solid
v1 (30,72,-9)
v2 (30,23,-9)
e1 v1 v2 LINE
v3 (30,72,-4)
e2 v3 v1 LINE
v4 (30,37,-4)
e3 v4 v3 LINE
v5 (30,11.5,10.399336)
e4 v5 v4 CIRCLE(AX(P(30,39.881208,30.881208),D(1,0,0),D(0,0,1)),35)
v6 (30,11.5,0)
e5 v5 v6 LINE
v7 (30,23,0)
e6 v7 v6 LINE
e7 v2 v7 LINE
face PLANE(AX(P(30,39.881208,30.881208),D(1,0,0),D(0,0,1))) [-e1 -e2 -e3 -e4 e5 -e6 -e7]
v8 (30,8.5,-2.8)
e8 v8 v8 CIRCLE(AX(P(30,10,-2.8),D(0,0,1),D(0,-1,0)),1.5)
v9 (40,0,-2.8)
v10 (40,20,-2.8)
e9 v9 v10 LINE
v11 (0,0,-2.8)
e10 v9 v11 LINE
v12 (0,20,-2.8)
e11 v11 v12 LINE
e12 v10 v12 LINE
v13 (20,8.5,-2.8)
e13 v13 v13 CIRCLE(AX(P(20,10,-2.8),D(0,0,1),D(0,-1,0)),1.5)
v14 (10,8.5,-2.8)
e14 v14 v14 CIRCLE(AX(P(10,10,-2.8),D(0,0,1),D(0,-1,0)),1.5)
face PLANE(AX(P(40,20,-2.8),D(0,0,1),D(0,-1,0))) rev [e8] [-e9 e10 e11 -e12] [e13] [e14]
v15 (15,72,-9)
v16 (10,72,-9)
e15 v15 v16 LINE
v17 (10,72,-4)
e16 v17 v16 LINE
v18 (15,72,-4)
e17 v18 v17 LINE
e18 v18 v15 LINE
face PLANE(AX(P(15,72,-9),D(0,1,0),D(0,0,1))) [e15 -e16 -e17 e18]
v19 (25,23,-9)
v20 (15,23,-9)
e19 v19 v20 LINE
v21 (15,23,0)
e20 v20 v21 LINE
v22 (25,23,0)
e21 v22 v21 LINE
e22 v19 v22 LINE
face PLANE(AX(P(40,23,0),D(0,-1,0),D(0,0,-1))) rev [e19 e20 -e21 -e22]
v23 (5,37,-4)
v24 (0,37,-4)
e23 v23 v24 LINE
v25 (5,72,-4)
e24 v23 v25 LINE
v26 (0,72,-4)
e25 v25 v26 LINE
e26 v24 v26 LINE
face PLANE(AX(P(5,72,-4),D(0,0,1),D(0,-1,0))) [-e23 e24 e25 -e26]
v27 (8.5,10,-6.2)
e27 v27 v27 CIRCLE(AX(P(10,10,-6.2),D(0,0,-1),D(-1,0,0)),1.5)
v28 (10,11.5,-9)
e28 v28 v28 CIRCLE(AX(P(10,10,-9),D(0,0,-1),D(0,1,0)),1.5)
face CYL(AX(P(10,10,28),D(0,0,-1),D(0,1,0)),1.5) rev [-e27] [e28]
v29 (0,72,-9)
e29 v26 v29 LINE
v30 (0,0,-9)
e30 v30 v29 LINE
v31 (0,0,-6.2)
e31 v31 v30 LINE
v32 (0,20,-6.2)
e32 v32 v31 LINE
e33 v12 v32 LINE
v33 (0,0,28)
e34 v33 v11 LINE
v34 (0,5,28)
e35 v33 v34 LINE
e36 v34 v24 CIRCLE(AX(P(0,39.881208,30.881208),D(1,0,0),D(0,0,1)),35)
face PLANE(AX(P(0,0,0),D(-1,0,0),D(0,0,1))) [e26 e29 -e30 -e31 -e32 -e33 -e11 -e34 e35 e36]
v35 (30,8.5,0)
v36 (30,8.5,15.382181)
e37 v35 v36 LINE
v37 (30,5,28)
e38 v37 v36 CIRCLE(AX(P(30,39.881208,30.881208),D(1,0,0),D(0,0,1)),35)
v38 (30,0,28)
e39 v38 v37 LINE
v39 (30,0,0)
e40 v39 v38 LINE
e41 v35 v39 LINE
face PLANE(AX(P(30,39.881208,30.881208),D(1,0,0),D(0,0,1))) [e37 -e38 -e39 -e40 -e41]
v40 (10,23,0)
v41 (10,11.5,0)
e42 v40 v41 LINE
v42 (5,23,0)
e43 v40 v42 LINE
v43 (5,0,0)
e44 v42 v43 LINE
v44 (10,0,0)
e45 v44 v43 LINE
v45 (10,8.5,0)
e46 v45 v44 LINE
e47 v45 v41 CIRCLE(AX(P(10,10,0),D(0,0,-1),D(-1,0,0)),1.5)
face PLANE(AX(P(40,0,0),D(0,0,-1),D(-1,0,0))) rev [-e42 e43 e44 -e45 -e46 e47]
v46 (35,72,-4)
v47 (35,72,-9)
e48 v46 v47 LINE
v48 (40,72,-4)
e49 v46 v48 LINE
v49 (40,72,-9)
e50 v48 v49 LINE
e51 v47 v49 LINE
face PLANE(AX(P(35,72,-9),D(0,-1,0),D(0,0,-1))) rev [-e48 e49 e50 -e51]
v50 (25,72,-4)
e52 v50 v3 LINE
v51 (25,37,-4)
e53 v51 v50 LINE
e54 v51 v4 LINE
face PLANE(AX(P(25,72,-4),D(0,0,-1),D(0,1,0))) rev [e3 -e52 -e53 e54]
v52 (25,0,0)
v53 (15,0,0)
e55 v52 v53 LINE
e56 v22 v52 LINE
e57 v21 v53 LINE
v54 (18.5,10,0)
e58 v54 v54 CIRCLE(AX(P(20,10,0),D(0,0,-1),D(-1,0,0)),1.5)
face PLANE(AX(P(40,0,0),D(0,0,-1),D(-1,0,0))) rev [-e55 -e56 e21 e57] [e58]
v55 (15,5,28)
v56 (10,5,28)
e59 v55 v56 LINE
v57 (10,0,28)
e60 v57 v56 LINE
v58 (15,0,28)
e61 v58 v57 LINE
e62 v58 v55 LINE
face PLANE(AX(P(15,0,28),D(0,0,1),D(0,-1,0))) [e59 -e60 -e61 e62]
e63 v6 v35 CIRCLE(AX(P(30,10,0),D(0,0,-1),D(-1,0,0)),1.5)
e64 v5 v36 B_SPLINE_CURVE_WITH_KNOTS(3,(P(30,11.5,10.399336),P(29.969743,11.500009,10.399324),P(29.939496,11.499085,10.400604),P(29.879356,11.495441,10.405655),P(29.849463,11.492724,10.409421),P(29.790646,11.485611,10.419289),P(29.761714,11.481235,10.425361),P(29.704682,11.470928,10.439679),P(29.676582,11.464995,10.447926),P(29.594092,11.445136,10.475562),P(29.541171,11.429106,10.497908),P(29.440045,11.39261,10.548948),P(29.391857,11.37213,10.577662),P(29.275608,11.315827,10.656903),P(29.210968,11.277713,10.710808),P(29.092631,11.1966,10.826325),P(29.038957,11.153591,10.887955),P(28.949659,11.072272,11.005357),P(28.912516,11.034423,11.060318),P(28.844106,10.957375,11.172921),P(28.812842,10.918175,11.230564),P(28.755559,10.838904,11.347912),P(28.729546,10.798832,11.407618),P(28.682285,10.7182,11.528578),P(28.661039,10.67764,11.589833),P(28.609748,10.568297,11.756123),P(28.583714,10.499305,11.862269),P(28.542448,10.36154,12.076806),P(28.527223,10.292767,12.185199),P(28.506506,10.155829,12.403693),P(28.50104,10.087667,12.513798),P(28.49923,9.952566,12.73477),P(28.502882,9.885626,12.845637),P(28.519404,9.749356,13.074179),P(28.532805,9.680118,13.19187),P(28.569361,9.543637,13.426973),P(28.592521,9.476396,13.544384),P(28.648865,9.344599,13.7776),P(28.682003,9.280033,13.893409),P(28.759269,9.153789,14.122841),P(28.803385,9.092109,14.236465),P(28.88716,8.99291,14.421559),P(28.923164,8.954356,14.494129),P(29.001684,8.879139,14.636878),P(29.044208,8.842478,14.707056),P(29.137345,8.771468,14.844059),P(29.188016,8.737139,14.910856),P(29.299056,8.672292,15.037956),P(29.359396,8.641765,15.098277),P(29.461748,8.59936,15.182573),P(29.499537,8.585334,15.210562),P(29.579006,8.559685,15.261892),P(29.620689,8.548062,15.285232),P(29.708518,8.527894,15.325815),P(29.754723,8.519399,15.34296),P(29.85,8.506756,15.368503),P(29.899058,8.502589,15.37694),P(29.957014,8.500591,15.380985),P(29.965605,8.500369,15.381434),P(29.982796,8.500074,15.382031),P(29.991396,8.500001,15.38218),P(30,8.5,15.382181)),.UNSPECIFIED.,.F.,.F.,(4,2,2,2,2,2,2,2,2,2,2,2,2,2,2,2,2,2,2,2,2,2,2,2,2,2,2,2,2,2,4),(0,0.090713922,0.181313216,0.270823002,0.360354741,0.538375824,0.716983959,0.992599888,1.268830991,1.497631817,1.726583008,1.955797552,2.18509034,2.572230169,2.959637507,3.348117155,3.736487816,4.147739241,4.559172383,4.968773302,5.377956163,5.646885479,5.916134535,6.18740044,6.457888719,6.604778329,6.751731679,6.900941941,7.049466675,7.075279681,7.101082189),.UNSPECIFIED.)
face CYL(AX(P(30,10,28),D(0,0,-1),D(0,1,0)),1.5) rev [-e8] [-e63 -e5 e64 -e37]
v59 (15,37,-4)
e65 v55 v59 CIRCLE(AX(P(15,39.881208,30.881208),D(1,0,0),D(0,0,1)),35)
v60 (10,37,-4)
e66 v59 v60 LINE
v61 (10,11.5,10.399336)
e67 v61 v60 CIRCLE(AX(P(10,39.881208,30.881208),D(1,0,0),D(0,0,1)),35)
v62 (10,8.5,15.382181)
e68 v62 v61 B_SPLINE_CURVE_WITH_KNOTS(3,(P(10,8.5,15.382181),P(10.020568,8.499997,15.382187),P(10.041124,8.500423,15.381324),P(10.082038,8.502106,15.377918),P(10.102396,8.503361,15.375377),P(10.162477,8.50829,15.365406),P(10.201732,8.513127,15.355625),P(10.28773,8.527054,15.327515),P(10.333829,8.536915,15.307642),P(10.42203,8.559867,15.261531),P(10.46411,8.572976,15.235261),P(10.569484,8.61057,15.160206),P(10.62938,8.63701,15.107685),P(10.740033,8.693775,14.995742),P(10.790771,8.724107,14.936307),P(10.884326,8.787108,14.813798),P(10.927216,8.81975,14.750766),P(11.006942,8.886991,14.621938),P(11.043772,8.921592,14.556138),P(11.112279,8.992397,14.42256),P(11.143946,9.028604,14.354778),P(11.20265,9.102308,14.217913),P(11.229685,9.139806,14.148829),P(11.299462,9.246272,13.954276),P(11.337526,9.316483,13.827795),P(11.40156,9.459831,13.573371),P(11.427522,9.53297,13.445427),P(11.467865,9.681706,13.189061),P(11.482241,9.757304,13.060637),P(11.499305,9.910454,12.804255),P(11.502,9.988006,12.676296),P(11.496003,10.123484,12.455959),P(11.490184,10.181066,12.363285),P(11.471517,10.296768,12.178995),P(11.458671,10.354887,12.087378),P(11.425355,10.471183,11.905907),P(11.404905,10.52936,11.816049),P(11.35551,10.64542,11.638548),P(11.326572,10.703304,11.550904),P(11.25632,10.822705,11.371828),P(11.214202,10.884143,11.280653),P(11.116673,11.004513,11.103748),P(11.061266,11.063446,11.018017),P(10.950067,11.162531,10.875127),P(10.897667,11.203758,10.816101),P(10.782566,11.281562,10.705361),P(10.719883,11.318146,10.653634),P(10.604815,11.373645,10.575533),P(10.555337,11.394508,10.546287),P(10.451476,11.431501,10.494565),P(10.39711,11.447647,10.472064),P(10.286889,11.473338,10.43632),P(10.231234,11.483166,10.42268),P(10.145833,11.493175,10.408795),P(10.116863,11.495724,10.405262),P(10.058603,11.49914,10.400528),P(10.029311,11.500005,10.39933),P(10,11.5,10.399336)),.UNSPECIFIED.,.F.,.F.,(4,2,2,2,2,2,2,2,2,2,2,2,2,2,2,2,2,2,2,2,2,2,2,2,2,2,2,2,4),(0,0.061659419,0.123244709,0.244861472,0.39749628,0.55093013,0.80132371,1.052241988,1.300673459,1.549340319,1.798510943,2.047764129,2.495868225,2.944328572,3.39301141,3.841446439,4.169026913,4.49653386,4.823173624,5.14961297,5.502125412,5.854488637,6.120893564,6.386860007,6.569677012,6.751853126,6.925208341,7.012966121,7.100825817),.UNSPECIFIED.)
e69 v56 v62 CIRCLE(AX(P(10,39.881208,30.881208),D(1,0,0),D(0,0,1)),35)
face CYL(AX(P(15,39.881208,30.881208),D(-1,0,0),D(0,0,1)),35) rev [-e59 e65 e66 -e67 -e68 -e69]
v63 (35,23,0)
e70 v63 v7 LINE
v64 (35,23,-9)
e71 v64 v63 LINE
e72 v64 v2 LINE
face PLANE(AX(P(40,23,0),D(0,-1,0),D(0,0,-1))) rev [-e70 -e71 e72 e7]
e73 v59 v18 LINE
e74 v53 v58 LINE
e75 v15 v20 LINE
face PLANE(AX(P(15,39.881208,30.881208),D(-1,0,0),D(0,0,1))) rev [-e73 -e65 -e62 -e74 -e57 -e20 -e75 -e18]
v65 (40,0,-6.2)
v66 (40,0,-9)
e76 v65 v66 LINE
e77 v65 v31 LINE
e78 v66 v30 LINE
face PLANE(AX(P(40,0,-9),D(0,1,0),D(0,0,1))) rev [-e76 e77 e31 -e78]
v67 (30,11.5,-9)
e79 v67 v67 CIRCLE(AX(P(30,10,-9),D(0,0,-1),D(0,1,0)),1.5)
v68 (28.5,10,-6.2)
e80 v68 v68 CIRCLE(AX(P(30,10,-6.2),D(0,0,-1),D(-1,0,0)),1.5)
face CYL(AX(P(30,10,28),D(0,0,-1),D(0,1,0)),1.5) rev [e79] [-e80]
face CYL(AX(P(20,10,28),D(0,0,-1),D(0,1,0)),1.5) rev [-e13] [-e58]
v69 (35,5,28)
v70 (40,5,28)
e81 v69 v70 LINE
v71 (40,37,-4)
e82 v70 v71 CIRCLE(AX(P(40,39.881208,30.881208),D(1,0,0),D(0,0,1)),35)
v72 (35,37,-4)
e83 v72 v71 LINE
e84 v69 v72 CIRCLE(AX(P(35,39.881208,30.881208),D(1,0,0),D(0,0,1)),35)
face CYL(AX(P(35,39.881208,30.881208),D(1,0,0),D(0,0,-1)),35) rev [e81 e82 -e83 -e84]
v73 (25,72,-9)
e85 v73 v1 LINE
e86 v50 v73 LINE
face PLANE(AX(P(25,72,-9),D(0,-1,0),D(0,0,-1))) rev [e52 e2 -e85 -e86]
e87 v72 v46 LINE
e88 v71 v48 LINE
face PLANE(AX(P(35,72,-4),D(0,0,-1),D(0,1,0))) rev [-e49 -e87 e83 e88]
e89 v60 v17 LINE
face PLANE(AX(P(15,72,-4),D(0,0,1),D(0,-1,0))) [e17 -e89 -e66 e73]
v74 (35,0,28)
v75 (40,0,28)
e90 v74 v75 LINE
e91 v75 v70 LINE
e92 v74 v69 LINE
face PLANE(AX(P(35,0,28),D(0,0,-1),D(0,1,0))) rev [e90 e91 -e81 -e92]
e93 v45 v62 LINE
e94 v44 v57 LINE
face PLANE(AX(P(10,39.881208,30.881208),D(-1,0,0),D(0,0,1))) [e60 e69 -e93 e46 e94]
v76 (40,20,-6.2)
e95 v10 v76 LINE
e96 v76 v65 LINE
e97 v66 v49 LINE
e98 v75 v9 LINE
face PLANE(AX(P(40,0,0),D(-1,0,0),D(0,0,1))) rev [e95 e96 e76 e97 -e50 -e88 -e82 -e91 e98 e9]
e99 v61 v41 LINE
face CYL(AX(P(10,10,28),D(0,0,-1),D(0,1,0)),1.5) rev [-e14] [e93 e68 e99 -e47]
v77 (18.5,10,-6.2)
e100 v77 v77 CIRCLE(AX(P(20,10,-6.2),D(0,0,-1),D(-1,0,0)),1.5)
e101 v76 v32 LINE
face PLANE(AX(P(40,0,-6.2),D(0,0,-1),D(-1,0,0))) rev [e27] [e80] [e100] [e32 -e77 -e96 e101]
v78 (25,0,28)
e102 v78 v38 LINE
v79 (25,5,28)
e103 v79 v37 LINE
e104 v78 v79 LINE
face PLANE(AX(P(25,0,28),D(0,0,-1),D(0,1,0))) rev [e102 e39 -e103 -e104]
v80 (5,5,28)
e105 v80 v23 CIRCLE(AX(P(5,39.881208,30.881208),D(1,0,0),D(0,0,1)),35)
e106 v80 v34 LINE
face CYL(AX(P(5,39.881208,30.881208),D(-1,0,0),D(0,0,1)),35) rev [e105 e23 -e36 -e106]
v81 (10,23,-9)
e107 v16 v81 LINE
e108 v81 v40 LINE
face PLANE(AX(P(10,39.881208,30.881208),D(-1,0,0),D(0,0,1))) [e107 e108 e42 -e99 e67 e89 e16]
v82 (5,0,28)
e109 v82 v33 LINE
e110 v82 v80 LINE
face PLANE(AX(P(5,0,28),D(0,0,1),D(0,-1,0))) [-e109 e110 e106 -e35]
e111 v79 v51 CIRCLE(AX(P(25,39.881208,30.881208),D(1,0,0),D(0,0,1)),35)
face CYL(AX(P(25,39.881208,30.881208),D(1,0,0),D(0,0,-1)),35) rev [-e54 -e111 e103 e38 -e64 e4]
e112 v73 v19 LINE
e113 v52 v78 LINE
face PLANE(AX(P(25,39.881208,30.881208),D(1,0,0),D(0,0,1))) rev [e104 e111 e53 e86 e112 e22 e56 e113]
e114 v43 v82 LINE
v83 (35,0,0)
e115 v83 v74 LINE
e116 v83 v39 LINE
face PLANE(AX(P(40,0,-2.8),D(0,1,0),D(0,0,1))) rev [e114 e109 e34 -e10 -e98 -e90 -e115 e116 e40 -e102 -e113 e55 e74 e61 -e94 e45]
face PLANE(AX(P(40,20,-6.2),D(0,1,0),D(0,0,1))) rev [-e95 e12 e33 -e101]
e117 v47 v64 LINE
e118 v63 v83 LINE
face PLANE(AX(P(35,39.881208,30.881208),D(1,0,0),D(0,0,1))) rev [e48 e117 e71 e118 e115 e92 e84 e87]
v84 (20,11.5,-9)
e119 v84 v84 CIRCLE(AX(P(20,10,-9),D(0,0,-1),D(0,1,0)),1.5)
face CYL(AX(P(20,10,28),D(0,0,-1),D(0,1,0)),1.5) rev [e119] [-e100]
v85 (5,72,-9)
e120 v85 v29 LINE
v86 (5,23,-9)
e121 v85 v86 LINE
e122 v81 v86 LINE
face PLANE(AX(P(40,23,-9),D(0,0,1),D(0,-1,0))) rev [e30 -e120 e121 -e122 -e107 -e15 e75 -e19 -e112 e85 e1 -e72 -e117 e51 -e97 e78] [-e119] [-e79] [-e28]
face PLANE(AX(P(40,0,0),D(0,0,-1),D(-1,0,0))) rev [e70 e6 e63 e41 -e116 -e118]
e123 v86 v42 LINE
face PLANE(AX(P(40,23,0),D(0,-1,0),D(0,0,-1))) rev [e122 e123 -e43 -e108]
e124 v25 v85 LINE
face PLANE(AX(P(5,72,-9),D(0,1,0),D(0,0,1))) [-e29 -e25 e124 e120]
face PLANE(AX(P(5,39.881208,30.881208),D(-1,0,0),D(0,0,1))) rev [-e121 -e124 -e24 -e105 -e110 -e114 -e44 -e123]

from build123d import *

# Parameters (mm, degrees)
BOSS_EXTRUDE1_DEPTH = 40
BOSS_EXTRUDE2_DEPTH = 5
LPATTERN1_COUNT     = 2
LPATTERN1_PITCH     = 10
SKETCH4_R           = 1.5
CUT_EXTRUDE2_DEPTH  = 91.293964361


# Read off the part's stored shape, not the designer's step: Mirror1
with BuildPart() as part:
    # Sketch1 → Boss-Extrude1 (new body)
    with BuildSketch(Plane(origin=(0, 0, 0), x_dir=(0, 0, -1), z_dir=(1, 0, 0))):
        Polygon((0, 0), (0, 23), (9, 23), (9, 0), (6.2, 0), (6.2, 20), (2.8, 20), (2.8, 0), align=None)
    extrude(amount=BOSS_EXTRUDE1_DEPTH)

    # Sketch3 → Boss-Extrude2 (add)
    with BuildSketch(Plane.ZY):
        with BuildLine():
            Line((0, 0), (28, 0))
            Line((28, 0), (28, 5))
            ThreePointArc((28, 5), (6.132470247, 15.132470247), (-4, 37))
            Line((-4, 37), (-4, 72))
            Line((-4, 72), (-9, 72))
            Line((-9, 72), (-9, 37))
            Line((-9, 37), (-9, 23))
            Line((-9, 23), (0, 23))
            Line((0, 23), (0, 0))
        make_face()
    boss_extrude2 = extrude(amount=-BOSS_EXTRUDE2_DEPTH)

    # LPattern1: Boss-Extrude2 ×2
    with Locations(*[(i * LPATTERN1_PITCH, 0, 0) for i in range(1, LPATTERN1_COUNT)]):
        add(boss_extrude2)

    # Sketch4 → Cut-Extrude2 (cut, through all)
    with BuildSketch(Plane(origin=(0, 0, -9), x_dir=(-1, 0, 0), z_dir=(0, 0, -1))):
        with Locations(Location((-10, 10, 0), (0, 0, 270))):
            Circle(SKETCH4_R)
        with Locations(Location((-20, 10, 0), (0, 0, 90))):
            Circle(SKETCH4_R)
        with Locations(Location((-30, 10, 0), (0, 0, 90))):
            Circle(SKETCH4_R)
    extrude(amount=-CUT_EXTRUDE2_DEPTH, mode=Mode.SUBTRACT)

    # Mirror1: part across plane


with BuildPart() as part_1:
    add(part.part)
    add(part.part.mirror(Plane.ZY.offset(-20)))


solid = part_1.part
